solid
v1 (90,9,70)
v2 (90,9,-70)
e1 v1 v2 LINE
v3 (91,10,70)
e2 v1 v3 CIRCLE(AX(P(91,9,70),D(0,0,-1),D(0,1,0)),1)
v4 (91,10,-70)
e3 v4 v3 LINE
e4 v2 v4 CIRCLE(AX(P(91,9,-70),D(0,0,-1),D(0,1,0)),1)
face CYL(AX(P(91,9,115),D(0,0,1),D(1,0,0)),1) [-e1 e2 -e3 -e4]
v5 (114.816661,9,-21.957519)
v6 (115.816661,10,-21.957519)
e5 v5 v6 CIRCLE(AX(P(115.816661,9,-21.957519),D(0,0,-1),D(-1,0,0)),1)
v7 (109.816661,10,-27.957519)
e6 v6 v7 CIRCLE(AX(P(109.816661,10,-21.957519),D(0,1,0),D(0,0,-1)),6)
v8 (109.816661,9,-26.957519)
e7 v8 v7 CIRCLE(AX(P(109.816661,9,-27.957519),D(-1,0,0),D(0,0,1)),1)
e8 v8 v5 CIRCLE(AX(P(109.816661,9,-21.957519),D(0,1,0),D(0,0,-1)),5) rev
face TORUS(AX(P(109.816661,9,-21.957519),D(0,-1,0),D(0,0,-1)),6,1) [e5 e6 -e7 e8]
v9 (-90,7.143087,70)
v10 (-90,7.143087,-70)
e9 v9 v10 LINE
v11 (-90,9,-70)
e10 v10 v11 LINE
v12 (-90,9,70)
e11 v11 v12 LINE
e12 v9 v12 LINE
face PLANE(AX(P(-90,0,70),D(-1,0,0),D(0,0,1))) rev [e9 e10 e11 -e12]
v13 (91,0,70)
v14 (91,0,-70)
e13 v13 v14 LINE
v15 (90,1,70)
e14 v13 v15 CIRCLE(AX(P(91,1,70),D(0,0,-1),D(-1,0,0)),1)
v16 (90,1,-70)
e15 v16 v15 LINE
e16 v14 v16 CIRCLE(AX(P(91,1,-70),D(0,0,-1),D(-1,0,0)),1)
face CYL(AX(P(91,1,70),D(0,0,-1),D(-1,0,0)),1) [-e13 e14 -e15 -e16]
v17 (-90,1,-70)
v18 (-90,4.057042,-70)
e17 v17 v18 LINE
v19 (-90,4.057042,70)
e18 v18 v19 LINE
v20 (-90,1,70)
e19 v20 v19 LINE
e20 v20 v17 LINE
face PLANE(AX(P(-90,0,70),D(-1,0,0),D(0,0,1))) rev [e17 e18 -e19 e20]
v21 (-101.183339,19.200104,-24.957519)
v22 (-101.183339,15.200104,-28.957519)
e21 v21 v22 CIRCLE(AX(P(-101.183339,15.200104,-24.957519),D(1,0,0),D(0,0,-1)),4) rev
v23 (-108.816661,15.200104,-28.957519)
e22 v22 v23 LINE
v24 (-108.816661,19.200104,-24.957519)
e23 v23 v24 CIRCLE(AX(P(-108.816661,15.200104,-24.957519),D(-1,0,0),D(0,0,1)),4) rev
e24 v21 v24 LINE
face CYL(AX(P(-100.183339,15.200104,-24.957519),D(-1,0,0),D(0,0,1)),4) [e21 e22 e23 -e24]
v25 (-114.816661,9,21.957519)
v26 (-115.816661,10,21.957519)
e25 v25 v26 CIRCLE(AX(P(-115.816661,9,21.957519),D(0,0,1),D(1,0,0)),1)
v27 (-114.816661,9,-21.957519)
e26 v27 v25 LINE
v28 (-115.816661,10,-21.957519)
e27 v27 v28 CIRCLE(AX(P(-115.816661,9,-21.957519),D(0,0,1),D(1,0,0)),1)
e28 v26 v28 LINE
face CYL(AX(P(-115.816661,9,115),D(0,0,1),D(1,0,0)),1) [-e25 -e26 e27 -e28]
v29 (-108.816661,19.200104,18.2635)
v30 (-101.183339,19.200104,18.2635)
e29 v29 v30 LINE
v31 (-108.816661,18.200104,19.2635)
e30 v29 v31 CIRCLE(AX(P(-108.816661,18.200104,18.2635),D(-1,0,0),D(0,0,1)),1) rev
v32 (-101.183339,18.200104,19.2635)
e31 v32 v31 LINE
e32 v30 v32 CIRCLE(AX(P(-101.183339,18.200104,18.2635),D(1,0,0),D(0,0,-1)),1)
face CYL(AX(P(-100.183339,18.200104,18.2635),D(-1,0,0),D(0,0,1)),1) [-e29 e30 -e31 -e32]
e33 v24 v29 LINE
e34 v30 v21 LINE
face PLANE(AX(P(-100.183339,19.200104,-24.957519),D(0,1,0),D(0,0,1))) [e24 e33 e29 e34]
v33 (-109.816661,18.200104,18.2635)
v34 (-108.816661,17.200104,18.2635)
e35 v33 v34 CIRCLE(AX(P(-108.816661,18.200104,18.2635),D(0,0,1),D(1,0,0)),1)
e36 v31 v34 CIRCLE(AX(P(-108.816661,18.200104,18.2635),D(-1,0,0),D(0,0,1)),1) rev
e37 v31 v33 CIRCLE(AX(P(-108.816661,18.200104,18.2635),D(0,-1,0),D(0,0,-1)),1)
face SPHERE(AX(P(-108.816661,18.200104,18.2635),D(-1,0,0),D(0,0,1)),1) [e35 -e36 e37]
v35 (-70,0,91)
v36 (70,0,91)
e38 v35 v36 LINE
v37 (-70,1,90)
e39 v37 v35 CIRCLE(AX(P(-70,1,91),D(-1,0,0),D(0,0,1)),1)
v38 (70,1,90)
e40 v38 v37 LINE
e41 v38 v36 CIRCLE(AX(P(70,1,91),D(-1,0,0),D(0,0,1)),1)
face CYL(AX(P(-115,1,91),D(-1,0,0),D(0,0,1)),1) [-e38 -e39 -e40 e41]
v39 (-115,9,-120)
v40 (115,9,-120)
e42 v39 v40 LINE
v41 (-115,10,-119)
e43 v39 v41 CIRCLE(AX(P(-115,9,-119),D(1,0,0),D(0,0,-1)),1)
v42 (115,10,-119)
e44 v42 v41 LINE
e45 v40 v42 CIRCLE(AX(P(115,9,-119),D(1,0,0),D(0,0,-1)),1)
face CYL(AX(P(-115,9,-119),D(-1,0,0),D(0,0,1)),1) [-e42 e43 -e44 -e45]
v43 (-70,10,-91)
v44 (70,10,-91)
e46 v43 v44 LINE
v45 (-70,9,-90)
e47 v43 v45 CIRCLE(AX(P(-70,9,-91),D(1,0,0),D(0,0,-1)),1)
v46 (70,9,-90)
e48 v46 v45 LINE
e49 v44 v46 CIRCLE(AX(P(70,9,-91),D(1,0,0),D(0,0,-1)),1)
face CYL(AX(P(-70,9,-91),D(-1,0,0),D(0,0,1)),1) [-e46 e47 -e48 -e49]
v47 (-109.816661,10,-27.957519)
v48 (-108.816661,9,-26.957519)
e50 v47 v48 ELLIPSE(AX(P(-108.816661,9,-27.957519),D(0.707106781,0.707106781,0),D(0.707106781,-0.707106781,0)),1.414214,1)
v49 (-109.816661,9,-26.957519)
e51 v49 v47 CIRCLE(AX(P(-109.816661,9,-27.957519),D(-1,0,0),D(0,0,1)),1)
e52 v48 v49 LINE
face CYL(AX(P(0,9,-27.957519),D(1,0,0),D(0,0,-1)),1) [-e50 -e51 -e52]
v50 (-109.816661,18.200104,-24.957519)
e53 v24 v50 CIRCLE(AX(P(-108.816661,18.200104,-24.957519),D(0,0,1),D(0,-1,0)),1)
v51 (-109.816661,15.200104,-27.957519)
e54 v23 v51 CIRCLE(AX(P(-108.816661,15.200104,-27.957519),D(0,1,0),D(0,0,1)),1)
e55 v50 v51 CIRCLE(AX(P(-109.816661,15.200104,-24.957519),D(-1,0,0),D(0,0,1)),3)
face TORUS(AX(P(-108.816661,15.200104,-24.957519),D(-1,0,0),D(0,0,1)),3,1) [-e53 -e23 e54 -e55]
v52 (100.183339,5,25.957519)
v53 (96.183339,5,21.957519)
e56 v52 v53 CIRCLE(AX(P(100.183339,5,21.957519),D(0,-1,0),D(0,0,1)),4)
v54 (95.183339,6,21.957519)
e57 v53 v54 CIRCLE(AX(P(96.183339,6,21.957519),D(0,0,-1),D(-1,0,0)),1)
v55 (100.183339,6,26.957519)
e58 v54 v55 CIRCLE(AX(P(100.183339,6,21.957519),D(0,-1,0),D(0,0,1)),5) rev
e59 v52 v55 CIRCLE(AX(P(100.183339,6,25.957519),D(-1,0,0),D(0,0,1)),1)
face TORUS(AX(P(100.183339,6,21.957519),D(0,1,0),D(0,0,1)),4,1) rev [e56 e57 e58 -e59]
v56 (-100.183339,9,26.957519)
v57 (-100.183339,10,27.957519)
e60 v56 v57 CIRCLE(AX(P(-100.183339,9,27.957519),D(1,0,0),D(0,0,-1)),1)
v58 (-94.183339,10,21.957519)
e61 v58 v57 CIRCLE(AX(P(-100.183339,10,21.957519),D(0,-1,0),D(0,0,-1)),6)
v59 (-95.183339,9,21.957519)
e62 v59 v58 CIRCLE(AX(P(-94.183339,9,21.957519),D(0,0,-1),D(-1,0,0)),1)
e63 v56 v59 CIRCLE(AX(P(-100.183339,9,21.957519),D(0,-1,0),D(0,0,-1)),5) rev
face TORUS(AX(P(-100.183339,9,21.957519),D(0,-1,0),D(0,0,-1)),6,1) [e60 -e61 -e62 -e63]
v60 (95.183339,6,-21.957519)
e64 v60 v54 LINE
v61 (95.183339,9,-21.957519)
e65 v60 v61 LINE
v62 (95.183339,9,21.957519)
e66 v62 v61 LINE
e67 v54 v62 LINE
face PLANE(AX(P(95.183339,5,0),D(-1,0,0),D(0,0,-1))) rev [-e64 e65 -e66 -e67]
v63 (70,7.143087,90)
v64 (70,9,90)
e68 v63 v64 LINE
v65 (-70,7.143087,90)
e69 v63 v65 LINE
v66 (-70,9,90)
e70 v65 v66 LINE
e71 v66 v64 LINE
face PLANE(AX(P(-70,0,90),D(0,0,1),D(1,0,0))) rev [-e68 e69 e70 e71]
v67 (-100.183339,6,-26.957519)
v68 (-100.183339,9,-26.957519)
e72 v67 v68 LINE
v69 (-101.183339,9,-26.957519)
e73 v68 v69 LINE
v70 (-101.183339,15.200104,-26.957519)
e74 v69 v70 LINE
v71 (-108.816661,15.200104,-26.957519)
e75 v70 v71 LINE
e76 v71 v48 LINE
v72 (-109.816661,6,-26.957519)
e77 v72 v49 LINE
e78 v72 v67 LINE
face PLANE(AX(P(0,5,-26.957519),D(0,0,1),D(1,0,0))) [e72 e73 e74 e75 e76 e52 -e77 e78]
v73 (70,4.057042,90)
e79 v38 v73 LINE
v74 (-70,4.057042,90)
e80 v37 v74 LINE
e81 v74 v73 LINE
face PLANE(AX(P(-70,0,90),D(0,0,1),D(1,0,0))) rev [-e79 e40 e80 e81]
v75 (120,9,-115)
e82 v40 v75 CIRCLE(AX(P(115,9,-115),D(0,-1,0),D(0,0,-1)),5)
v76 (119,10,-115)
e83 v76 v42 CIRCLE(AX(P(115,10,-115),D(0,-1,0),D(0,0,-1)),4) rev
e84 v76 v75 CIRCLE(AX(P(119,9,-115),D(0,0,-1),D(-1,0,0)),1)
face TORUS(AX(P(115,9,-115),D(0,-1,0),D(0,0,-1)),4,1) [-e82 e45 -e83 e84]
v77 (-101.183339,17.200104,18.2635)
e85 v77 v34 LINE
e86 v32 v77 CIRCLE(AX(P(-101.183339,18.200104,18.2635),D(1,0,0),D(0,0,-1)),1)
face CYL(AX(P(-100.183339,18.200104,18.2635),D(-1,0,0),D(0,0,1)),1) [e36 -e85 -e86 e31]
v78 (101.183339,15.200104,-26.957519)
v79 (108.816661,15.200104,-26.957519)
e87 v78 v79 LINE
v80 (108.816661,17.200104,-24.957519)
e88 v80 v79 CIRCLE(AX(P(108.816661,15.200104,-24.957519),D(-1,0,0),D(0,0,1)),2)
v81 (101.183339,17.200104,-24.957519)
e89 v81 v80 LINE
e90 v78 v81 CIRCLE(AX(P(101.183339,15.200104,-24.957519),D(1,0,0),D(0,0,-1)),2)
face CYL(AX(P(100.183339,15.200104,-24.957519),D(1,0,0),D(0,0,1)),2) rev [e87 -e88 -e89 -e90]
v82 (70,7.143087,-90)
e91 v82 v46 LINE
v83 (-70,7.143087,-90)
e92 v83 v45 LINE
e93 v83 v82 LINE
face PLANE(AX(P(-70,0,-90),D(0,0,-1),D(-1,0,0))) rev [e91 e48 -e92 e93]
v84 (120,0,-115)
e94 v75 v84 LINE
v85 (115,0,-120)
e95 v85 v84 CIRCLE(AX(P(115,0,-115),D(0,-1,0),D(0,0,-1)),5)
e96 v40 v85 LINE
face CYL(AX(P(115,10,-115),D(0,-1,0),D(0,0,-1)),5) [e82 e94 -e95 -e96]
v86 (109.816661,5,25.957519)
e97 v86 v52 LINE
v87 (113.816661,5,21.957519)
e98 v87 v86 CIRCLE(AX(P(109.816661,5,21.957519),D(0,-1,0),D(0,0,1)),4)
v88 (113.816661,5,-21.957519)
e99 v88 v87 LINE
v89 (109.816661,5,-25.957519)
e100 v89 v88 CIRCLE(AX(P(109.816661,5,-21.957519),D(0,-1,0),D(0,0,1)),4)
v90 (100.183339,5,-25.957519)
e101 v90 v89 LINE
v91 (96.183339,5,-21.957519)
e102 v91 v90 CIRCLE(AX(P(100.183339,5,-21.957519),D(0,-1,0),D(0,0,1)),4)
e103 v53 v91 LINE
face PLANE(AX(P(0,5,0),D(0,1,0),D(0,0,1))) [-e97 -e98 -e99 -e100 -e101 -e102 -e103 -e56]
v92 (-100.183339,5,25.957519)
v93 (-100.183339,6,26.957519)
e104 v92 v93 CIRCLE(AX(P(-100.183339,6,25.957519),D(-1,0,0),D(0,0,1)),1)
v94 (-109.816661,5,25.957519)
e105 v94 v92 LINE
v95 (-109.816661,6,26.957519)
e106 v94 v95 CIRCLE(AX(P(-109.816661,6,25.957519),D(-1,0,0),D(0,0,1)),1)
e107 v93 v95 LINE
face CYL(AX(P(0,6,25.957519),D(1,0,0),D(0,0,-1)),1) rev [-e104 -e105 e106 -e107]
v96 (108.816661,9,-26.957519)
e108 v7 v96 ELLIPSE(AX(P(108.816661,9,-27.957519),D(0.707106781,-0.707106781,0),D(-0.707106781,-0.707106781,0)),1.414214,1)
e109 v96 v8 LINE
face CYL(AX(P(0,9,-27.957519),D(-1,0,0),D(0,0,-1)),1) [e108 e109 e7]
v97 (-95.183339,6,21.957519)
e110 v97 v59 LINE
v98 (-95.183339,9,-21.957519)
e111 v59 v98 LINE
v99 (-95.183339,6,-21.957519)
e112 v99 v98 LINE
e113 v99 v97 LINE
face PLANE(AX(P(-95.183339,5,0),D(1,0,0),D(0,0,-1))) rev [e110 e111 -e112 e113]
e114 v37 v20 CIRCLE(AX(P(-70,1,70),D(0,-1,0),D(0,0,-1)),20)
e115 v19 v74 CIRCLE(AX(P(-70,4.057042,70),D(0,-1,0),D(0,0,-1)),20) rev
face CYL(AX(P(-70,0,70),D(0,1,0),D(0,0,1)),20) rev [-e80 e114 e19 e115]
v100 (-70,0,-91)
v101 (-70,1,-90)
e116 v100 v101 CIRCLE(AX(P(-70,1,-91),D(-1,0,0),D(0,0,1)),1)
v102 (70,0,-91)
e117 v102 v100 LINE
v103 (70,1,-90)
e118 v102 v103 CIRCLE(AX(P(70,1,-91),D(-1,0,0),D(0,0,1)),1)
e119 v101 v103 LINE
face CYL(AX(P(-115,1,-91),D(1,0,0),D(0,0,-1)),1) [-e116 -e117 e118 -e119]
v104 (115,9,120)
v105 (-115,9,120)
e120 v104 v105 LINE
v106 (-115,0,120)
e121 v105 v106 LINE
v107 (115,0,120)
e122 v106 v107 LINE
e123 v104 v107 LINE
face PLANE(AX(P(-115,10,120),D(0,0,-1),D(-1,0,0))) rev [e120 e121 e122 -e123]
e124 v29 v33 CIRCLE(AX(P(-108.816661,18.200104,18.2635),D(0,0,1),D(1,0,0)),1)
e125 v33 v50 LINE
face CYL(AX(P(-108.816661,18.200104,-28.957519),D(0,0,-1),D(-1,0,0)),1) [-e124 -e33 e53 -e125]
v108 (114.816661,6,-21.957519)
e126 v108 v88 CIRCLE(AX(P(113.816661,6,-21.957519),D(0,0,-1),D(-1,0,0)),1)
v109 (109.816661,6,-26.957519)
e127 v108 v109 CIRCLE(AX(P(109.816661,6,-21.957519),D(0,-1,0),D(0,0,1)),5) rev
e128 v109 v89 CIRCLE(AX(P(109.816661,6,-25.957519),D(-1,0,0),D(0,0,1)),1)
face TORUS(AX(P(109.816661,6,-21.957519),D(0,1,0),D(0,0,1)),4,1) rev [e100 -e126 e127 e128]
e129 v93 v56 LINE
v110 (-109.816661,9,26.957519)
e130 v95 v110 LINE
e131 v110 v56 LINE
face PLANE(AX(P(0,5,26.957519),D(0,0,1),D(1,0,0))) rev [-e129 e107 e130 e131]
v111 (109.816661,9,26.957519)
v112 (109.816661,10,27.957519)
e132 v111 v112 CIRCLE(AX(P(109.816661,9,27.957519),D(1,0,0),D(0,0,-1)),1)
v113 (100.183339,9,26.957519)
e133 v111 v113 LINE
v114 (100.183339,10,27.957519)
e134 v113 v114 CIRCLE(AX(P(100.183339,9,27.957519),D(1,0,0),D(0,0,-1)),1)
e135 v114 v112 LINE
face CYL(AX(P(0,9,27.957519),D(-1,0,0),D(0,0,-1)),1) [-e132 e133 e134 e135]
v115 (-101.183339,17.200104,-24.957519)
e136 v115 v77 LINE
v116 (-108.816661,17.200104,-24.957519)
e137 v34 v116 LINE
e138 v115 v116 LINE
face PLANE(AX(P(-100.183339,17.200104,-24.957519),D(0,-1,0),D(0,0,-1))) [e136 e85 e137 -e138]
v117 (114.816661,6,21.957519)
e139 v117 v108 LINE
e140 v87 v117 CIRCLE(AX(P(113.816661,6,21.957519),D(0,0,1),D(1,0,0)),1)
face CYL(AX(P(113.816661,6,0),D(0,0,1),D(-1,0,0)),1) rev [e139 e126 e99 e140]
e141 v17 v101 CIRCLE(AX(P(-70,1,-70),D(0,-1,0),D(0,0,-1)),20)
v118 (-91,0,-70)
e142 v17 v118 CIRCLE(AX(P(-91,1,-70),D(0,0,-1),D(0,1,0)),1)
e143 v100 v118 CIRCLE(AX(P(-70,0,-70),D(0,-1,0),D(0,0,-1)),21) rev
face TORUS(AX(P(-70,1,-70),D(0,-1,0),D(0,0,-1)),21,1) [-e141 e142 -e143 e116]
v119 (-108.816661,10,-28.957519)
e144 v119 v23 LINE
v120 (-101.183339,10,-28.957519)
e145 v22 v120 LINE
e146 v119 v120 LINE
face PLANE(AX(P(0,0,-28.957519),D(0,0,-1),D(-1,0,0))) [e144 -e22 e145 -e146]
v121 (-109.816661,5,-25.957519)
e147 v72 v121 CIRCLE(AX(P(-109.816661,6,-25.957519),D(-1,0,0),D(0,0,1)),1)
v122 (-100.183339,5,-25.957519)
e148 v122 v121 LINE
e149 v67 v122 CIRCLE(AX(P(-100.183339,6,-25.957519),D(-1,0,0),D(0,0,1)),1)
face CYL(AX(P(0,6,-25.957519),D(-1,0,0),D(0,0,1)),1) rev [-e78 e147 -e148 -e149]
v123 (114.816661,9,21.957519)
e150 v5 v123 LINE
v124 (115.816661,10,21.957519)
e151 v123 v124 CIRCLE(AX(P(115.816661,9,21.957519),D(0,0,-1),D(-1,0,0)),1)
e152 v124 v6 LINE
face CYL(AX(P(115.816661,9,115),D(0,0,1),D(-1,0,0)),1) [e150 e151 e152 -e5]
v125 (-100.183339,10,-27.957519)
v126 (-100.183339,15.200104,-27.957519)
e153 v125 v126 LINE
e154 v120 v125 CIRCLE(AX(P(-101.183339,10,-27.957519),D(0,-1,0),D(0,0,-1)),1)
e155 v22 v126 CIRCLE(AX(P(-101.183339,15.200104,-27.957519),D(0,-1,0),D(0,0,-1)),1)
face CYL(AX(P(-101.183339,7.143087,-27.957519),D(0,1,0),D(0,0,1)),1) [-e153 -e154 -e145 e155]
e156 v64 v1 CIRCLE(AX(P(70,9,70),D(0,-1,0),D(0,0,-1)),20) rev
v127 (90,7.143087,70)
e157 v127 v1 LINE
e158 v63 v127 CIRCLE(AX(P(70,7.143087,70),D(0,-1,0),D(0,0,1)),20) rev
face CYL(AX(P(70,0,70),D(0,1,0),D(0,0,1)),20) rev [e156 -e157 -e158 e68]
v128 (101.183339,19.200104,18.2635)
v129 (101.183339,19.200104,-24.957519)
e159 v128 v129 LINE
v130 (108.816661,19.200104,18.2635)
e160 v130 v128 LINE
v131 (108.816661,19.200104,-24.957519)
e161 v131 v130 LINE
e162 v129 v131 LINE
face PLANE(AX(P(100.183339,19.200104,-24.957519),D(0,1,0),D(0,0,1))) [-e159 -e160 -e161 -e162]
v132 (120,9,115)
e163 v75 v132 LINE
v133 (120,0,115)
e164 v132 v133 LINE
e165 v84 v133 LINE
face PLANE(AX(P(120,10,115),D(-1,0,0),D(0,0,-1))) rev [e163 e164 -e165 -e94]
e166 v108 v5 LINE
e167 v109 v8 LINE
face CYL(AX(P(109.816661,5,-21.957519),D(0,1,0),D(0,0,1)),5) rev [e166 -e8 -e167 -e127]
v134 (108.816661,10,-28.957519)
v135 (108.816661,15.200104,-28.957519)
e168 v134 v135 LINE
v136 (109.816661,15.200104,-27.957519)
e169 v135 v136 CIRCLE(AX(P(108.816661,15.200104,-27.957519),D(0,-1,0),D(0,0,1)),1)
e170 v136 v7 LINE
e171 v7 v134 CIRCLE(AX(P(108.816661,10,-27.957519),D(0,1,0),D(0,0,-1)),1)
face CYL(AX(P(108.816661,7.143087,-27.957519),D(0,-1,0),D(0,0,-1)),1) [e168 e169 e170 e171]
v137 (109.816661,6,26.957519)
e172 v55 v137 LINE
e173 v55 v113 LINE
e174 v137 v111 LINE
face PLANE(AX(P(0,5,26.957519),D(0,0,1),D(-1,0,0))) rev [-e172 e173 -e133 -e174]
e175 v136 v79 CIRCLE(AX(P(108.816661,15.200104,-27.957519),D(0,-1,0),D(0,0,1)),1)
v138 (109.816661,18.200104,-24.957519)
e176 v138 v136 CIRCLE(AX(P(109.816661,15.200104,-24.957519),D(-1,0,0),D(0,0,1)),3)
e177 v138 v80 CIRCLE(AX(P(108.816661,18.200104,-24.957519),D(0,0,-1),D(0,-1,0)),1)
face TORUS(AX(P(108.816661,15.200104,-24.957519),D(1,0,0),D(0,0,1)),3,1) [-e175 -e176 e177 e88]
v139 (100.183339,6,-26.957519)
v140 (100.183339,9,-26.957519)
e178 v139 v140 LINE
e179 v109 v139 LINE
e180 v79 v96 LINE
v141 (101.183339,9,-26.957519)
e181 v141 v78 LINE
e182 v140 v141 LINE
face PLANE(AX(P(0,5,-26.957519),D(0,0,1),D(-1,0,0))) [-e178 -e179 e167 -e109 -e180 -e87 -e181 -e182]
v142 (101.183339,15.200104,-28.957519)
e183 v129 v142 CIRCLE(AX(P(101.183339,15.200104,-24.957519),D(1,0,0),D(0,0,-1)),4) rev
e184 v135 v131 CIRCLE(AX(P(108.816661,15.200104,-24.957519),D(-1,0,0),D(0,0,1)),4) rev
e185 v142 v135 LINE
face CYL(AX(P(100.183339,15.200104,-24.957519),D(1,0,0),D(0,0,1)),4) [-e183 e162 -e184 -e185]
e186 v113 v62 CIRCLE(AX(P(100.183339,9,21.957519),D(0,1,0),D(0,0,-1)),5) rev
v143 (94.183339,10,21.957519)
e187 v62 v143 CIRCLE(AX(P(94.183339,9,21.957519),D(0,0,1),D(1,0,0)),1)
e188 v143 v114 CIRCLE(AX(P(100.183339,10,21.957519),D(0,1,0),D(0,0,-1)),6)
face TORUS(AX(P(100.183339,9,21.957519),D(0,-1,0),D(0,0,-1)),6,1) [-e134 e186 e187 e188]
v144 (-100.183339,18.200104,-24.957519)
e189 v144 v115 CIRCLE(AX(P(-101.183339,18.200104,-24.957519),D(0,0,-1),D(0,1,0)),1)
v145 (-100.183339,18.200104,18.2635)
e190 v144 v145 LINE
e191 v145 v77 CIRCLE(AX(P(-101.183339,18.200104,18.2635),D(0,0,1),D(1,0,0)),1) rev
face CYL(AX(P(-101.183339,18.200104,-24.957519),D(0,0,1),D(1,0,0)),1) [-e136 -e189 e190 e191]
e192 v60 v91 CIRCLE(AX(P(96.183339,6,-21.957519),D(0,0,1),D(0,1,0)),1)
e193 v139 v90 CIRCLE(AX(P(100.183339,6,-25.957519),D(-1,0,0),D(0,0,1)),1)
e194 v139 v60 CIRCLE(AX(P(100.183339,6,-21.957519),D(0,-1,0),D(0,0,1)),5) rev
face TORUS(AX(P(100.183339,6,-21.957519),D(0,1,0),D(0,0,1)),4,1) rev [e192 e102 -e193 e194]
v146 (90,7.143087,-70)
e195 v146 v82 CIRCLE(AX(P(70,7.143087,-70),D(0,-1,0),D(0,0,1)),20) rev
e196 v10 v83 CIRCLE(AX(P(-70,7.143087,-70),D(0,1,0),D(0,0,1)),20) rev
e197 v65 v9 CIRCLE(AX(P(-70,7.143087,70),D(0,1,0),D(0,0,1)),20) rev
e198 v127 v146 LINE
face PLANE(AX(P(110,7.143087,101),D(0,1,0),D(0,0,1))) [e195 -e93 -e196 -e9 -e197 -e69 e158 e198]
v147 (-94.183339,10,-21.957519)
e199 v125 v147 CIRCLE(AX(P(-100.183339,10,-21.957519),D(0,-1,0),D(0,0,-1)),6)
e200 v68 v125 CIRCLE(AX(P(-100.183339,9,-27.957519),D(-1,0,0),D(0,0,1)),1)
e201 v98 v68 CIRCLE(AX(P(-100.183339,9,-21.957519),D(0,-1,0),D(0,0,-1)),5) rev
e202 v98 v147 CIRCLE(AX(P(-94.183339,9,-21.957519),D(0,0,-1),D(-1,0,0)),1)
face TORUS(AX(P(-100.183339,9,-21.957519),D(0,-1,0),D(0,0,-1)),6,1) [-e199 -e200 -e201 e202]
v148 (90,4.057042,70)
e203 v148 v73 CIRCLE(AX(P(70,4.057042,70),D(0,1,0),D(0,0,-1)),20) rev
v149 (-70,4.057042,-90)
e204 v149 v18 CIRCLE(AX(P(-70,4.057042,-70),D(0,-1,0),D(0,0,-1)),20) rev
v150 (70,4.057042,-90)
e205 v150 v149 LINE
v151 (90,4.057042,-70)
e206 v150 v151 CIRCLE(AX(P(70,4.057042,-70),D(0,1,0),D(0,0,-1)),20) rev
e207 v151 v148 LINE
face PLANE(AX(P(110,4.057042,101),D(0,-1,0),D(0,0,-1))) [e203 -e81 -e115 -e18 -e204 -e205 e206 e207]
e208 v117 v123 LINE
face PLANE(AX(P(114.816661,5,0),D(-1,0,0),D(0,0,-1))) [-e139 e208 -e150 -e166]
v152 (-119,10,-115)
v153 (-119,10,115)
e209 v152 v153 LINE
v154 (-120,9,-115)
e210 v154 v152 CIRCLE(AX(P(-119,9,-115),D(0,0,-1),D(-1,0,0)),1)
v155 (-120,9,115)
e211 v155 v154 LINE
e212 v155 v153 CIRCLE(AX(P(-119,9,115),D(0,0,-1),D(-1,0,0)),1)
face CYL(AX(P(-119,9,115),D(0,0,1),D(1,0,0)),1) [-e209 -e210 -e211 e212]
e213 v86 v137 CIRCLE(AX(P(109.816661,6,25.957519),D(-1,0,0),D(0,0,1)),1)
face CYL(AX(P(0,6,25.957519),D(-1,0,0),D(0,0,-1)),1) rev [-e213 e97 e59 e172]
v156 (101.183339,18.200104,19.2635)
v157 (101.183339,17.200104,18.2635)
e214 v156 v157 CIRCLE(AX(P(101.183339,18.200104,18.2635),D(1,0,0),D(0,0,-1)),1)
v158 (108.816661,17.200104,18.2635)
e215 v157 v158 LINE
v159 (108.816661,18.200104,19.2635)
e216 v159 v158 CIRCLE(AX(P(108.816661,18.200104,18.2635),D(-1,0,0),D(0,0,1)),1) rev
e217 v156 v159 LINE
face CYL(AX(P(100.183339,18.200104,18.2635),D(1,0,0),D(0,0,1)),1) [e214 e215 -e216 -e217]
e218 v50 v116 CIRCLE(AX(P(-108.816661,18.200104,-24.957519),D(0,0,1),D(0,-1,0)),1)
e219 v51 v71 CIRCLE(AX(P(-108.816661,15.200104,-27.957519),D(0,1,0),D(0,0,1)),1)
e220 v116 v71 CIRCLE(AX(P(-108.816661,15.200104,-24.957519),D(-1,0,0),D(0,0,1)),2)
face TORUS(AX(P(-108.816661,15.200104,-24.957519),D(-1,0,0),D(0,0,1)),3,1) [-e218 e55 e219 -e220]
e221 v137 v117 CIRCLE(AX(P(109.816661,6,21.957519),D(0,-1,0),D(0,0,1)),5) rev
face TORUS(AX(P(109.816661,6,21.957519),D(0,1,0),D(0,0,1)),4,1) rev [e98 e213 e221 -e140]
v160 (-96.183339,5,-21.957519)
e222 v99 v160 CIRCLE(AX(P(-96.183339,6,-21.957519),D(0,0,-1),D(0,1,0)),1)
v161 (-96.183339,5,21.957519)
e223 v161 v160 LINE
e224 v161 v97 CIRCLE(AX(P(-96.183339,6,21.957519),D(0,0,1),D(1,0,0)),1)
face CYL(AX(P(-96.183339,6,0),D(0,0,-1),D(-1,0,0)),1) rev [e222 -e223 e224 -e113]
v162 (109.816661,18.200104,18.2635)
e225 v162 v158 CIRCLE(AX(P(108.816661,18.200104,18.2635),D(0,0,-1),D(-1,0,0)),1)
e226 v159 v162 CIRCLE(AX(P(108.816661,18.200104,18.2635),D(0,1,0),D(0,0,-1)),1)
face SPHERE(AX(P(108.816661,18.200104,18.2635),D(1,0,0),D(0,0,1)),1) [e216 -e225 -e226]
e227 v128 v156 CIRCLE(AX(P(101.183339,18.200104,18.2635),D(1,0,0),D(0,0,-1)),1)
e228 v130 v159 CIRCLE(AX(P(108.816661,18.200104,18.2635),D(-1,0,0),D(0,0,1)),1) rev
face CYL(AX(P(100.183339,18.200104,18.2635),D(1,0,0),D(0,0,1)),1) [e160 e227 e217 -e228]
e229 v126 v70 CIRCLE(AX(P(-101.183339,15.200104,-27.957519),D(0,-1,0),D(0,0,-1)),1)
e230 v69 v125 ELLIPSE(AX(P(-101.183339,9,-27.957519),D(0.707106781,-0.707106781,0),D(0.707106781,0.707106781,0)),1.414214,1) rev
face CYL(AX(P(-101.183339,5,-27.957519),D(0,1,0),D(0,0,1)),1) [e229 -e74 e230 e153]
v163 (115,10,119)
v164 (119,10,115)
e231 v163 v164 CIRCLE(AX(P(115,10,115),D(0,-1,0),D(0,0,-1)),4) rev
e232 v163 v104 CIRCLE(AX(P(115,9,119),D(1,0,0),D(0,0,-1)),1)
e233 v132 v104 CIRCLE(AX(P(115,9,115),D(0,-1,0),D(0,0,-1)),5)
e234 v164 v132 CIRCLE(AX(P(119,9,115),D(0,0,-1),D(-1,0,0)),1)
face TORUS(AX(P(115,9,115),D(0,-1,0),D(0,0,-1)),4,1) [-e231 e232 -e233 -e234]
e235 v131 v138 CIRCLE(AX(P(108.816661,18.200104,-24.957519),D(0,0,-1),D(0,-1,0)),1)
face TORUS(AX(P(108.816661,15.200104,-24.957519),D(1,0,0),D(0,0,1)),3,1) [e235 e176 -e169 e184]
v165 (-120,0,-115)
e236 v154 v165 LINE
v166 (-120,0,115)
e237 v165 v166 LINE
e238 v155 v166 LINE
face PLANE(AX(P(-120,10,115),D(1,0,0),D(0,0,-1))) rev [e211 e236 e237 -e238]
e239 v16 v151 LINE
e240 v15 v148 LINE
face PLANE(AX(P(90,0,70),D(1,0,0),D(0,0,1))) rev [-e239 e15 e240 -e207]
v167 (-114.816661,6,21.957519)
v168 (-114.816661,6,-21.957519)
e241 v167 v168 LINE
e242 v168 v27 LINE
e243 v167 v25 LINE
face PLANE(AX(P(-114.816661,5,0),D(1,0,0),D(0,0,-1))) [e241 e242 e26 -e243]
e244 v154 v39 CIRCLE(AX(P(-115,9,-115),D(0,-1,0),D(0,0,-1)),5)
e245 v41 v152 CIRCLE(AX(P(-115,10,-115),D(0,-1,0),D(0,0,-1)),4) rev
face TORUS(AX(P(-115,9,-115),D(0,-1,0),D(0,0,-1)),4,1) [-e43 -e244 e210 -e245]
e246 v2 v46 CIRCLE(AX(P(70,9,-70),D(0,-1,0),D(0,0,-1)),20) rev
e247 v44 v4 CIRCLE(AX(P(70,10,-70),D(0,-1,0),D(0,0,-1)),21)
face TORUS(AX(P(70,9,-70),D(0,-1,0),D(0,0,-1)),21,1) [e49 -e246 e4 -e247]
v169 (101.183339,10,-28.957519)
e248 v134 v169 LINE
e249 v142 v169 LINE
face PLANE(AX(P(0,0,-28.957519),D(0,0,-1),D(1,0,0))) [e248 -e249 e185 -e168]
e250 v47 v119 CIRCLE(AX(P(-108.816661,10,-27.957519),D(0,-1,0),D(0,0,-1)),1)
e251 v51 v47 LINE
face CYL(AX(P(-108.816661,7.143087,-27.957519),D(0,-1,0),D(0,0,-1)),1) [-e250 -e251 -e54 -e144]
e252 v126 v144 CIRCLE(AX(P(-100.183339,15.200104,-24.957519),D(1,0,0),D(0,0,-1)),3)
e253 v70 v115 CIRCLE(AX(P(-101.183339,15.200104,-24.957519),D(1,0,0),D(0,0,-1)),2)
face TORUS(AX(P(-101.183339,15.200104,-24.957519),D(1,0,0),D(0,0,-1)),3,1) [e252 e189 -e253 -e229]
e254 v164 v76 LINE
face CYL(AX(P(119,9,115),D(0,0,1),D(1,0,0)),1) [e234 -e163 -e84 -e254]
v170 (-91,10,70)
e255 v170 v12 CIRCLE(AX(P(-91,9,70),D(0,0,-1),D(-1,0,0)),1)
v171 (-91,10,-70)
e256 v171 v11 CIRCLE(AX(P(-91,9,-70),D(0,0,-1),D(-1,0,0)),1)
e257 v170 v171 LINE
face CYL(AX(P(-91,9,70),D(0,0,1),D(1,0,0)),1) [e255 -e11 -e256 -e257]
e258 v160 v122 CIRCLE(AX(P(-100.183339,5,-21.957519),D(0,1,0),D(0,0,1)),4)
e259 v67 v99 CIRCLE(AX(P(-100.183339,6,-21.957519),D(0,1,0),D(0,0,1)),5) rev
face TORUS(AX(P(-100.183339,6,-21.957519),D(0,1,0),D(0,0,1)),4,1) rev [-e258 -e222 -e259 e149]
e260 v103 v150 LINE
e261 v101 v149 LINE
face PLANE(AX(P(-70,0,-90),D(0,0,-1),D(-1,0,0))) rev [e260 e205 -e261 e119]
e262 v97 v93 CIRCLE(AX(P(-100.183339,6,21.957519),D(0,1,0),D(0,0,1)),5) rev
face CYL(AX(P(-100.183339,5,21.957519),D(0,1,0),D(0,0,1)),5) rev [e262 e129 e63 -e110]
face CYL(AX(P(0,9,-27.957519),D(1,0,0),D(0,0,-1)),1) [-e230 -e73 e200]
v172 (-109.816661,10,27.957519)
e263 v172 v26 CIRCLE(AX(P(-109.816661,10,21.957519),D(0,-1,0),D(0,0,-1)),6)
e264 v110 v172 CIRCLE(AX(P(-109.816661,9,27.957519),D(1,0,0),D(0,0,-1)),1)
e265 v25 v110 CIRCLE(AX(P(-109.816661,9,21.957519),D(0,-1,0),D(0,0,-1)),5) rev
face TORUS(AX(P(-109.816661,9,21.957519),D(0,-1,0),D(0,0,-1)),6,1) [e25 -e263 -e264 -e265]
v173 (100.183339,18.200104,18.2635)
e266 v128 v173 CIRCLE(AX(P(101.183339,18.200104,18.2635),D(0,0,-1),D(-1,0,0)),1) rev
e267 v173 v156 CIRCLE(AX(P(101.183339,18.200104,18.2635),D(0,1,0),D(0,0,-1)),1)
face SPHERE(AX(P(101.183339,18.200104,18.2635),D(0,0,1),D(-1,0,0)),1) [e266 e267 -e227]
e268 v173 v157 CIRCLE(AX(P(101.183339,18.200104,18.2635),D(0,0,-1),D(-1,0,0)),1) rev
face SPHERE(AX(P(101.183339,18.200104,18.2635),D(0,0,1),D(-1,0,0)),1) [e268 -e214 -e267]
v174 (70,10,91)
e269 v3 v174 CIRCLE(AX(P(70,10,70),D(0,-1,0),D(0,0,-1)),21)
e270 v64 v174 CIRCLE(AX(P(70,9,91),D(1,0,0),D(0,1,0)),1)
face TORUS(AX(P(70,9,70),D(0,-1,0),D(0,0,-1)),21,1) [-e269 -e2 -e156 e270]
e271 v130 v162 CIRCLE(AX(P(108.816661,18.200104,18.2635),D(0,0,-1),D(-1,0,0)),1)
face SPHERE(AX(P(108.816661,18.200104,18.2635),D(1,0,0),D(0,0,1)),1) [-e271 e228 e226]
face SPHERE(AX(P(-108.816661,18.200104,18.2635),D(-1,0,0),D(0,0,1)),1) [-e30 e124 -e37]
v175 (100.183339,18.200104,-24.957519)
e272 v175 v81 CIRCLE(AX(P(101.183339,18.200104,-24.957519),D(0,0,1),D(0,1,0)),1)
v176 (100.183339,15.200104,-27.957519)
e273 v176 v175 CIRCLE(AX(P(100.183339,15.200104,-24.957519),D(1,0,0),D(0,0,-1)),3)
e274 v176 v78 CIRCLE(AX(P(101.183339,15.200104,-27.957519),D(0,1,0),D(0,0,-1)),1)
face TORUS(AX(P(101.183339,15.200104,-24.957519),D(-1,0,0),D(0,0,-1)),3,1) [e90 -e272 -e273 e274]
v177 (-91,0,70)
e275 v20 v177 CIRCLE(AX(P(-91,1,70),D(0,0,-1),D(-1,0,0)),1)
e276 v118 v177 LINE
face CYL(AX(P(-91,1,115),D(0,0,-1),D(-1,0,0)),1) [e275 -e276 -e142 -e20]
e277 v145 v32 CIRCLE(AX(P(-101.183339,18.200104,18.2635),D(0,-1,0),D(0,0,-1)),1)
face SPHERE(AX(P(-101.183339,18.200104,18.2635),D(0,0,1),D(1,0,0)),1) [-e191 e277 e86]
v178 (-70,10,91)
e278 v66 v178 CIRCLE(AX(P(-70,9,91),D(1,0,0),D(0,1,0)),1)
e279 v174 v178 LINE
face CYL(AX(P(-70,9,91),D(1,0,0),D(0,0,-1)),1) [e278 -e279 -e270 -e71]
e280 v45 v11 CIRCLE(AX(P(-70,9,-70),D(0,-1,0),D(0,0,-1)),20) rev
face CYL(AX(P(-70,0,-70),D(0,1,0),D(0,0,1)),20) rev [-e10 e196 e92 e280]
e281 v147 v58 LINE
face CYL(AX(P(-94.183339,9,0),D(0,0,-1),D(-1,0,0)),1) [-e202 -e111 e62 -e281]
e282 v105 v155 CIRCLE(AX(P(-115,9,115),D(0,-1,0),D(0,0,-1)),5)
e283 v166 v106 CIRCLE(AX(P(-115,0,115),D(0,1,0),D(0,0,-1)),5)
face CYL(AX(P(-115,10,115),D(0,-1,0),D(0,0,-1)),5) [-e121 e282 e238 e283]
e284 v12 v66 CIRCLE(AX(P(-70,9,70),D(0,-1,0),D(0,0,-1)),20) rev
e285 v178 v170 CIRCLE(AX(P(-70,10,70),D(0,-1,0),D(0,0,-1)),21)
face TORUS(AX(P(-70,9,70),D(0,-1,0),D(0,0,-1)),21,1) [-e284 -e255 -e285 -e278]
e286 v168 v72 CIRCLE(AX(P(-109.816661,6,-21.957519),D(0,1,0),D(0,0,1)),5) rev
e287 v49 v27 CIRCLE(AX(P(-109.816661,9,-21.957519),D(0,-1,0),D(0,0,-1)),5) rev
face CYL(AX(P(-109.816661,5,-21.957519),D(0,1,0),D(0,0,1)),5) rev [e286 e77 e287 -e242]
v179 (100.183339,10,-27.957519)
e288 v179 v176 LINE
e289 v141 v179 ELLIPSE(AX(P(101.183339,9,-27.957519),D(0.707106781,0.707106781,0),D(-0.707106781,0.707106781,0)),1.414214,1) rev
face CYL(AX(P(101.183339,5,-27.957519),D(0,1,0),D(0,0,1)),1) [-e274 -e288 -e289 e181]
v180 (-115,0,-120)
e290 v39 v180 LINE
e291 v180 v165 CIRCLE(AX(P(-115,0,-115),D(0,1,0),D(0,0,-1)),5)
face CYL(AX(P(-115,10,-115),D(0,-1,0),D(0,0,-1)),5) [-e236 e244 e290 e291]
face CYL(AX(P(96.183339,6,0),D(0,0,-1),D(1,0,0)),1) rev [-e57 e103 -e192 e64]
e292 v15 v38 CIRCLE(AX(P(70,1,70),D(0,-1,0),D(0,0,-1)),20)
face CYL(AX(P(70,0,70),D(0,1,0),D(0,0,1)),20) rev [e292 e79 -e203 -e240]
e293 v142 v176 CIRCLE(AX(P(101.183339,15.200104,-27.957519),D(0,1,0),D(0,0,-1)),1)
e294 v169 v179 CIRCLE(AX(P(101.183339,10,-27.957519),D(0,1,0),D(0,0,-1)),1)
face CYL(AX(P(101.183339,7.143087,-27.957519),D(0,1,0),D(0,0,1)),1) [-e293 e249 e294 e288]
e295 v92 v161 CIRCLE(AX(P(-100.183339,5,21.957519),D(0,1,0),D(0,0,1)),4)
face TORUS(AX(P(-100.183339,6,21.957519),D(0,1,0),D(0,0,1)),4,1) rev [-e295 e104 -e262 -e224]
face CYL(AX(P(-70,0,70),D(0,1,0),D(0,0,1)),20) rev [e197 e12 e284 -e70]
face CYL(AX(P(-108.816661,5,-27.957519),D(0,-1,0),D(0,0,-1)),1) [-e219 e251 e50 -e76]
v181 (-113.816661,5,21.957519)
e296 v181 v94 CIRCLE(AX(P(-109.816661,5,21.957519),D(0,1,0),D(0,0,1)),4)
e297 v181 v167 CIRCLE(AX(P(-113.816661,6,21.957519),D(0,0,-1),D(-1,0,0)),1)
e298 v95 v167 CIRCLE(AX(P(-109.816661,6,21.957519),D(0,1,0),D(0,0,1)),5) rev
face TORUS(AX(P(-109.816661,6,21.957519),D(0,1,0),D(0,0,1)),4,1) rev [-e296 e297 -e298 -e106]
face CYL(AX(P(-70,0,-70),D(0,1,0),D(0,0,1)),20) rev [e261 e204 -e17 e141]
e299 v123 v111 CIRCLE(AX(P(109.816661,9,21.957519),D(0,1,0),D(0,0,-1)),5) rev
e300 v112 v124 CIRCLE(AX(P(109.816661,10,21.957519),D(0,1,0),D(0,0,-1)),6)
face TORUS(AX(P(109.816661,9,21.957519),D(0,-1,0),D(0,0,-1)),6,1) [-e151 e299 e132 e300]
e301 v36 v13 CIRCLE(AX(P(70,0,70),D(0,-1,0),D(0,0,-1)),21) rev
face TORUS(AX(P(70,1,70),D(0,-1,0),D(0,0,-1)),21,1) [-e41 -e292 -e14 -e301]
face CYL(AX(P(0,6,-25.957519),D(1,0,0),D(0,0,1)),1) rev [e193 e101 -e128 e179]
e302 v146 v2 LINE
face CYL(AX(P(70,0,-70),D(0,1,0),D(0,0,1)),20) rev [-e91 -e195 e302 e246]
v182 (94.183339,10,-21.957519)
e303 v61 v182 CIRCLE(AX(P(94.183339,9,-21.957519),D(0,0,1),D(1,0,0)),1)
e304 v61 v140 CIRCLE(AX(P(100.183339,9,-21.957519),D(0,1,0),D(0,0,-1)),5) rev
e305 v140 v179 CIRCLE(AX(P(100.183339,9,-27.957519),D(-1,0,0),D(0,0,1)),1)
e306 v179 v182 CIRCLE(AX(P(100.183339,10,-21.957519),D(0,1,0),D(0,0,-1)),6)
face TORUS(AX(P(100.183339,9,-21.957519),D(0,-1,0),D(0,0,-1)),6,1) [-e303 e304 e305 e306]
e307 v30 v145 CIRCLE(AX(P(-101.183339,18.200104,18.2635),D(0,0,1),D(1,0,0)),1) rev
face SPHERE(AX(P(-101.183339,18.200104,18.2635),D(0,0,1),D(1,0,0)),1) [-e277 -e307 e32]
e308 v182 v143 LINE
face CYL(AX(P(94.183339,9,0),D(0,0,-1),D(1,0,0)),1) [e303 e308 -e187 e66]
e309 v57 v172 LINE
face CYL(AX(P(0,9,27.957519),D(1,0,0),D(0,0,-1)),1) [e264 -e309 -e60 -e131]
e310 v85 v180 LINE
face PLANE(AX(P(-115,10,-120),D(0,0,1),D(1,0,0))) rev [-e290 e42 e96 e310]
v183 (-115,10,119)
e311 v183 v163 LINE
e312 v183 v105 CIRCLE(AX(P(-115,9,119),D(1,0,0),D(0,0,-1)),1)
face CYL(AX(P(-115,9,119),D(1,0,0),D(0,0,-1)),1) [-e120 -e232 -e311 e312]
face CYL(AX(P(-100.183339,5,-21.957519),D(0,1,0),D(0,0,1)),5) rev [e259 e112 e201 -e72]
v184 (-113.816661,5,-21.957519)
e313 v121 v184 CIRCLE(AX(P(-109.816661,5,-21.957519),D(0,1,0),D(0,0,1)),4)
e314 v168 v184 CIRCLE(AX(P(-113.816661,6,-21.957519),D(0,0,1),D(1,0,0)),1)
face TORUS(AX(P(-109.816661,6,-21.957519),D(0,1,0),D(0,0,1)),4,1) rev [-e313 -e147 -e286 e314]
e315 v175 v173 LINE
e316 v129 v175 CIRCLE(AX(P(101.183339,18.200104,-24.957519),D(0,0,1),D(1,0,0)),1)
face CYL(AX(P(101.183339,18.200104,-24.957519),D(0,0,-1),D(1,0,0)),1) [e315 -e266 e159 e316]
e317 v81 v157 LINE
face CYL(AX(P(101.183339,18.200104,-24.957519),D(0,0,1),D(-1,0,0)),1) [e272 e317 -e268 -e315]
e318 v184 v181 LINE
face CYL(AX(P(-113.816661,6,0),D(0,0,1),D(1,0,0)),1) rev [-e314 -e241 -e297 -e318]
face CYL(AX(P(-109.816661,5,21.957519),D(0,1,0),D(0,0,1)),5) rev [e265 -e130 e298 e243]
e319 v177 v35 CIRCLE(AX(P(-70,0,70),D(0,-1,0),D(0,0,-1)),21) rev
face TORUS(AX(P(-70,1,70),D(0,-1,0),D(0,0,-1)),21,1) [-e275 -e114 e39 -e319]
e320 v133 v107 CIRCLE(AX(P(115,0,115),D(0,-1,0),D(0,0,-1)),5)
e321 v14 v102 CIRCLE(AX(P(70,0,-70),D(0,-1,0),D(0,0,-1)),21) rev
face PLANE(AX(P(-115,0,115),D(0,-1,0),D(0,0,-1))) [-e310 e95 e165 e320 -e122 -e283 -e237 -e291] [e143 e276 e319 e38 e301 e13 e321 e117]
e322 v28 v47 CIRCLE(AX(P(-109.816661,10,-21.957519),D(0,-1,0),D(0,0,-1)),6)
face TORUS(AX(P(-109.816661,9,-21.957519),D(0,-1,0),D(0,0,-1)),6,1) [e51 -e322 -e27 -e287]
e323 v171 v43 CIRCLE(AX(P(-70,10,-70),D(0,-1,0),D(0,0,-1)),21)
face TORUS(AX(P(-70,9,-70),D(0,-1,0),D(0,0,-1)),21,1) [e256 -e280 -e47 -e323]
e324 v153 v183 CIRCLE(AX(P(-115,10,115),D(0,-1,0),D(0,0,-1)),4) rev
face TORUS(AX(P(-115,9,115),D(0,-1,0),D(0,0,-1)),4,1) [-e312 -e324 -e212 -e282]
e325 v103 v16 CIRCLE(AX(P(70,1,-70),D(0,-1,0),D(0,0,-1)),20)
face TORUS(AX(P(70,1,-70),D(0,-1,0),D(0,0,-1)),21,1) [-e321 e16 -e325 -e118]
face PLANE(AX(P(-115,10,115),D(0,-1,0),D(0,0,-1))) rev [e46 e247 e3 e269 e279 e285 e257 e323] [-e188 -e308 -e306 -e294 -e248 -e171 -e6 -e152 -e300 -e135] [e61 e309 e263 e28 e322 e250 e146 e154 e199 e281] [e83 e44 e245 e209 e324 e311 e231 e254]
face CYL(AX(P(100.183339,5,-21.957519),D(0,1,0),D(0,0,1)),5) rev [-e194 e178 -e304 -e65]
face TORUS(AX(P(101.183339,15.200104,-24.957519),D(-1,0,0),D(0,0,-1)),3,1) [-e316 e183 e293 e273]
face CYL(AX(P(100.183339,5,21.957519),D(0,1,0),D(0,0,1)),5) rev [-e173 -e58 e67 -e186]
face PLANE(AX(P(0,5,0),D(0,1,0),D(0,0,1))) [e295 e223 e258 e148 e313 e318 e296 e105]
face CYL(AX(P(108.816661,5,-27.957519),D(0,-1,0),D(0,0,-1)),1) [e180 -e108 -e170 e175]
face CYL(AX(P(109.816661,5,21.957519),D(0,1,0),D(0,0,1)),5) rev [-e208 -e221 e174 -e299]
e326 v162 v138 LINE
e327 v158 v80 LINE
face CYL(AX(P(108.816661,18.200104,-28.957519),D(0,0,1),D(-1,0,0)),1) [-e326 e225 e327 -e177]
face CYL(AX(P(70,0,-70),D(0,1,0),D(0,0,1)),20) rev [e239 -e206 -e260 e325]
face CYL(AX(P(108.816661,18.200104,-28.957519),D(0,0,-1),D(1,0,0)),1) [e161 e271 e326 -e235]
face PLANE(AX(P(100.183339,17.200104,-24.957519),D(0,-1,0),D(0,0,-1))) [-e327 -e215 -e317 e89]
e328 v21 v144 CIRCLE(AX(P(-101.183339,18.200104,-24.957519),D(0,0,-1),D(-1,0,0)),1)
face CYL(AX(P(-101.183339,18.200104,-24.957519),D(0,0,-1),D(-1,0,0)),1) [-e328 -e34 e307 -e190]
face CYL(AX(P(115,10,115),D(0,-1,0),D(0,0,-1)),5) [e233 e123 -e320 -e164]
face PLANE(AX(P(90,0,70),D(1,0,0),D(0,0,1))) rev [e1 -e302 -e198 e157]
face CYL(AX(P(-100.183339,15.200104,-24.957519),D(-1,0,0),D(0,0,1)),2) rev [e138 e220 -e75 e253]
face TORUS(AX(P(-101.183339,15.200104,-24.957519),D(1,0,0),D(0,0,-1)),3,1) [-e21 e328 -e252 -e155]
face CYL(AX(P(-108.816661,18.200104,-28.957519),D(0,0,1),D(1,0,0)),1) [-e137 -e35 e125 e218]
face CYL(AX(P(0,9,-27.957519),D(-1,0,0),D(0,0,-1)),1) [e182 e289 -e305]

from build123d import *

# Parameters (mm, degrees)
EXTRUDE_1_DEPTH     = 10
CUT_EXTRUDE_1_DEPTH = 10
SKETCH_3_W          = 225
SKETCH_3_H          = 3.086045957
EXTRUDE_2_DEPTH     = 221
CUT_EXTRUDE_2_DEPTH = 5
SKETCH_6_W          = 9.633321968
SKETCH_6_H          = 6.578899038
EXTRUDE_3_DEPTH     = 2
EXTRUDE_4_DEPTH     = 9.63332197
FILLET_1_R          = 1
FILLET_3_R          = 1
FILLET_4_R          = 1
SKETCH_10_W         = 142.442199646
SKETCH_10_H         = 252.346997023
CUT_EXTRUDE_3_DEPTH = 36.7
FILLET_5_R          = 1
FILLET_6_R          = 1


with BuildPart() as part:
    # 草图1 → 凸台-拉伸1 (new body)
    with BuildSketch(Plane(origin=(0, 0, 0), x_dir=(1, 0, 0), z_dir=(0, 1, 0))):
        with BuildLine():
            Line((-115, -120), (115, -120))
            ThreePointArc((115, -120), (118.535533906, -118.535533906), (120, -115))
            Line((120, -115), (120, 115))
            ThreePointArc((120, 115), (118.535533906, 118.535533906), (115, 120))
            Line((115, 120), (-115, 120))
            ThreePointArc((-115, 120), (-118.535533906, 118.535533906), (-120, 115))
            Line((-120, 115), (-120, -115))
            ThreePointArc((-120, -115), (-118.535533906, -118.535533906), (-115, -120))
        make_face()
    extrude(amount=EXTRUDE_1_DEPTH)

    # 草图2 → 切除-拉伸1 (cut)
    with BuildSketch(Plane(origin=(0, 10, 0), x_dir=(1, 0, 0), z_dir=(0, 1, 0))):
        with BuildLine():
            Line((-70, -90), (70, -90))
            ThreePointArc((70, -90), (84.142135624, -84.142135624), (90, -70))
            Line((90, -70), (90, 70))
            ThreePointArc((90, 70), (84.142135624, 84.142135624), (70, 90))
            Line((70, 90), (-70, 90))
            ThreePointArc((-70, 90), (-84.142135624, 84.142135624), (-90, 70))
            Line((-90, 70), (-90, -70))
            ThreePointArc((-90, -70), (-84.142135624, -84.142135624), (-70, -90))
        make_face()
    extrude(amount=-CUT_EXTRUDE_1_DEPTH, mode=Mode.SUBTRACT)


with BuildPart() as body_2:
    # 草图3 → 凸台-拉伸2 (new body)
    with BuildSketch(Plane(origin=(0, 0, -120), x_dir=(-1, 0, 0), z_dir=(0, 0, -1))):
        with Locations((2.5, 5.600064492)):
            Rectangle(SKETCH_3_W, SKETCH_3_H)
    extrude(amount=-EXTRUDE_2_DEPTH)


with BuildPart() as cut_extrude_2_tool:
    # 草图5 → 切除-拉伸2 (new body)
    with BuildSketch(Plane(origin=(0, 10, 0), x_dir=(1, 0, 0), z_dir=(0, 1, 0))):
        with BuildLine():
            Line((-114.816660984, 21.957519092), (-114.816660984, 0))
            Line((-114.816660984, 0), (-95.183339016, 0))
            Line((-95.183339016, 0), (-95.183339016, 21.957519092))
            ThreePointArc((-95.183339016, 21.957519092), (-96.64780511, 25.493052998), (-100.183339016, 26.957519092))
            Line((-100.183339016, 26.957519092), (-109.816660984, 26.957519092))
            ThreePointArc((-109.816660984, 26.957519092), (-113.35219489, 25.493052998), (-114.816660984, 21.957519092))
        make_face()
        with BuildLine():
            Line((-95.183339016, 0), (-114.816660984, 0))
            Line((-114.816660984, 0), (-114.816660984, -21.957519092))
            ThreePointArc((-114.816660984, -21.957519092), (-113.35219489, -25.493052998), (-109.816660984, -26.957519092))
            Line((-109.816660984, -26.957519092), (-100.183339016, -26.957519092))
            ThreePointArc((-100.183339016, -26.957519092), (-96.64780511, -25.493052998), (-95.183339016, -21.957519092))
            Line((-95.183339016, -21.957519092), (-95.183339016, 0))
        make_face()
        with BuildLine():
            Line((95.183339016, 21.957519092), (95.183339016, 0))
            Line((95.183339016, 0), (114.816660984, 0))
            Line((114.816660984, 0), (114.816660984, 21.957519092))
            ThreePointArc((114.816660984, 21.957519092), (113.35219489, 25.493052998), (109.816660984, 26.957519092))
            Line((109.816660984, 26.957519092), (100.183339016, 26.957519092))
            ThreePointArc((100.183339016, 26.957519092), (96.64780511, 25.493052998), (95.183339016, 21.957519092))
        make_face()
        with BuildLine():
            ThreePointArc((95.183339016, -21.957519092), (96.64780511, -25.493052998), (100.183339016, -26.957519092))
            Line((100.183339016, -26.957519092), (109.816660984, -26.957519092))
            ThreePointArc((109.816660984, -26.957519092), (113.35219489, -25.493052998), (114.816660984, -21.957519092))
            Line((114.816660984, -21.957519092), (114.816660984, 0))
            Line((114.816660984, 0), (95.183339016, 0))
            Line((95.183339016, 0), (95.183339016, -21.957519092))
        make_face()
    extrude(amount=-CUT_EXTRUDE_2_DEPTH)


with BuildPart() as part_1:
    add(part.part)

    # 切除-拉伸2: cut by cut_extrude_2_tool
    add(cut_extrude_2_tool.part, mode=Mode.SUBTRACT)



with BuildPart() as body_2_1:
    add(body_2.part)

    # 切除-拉伸2: cut by cut_extrude_2_tool
    add(cut_extrude_2_tool.part, mode=Mode.SUBTRACT)


with BuildPart() as part_2:
    add(part_1.part)

    add(body_2_1.part)  # 凸台-拉伸3 merges body 2
    # 草图6 → 凸台-拉伸3 (add)
    with BuildSketch(Plane.XY.offset(-26.957519092)):
        with Locations((-105, 10.432536989)):
            Rectangle(SKETCH_6_W, SKETCH_6_H)
    extrude(amount=-EXTRUDE_3_DEPTH)

    # 草图9 → 凸台-拉伸4 (add)
    with BuildSketch(Plane.ZY.offset(109.816660984)):
        with BuildLine():
            Line((-24.957519092, 17.200103887), (19.2635004, 17.200103887))
            Line((19.2635004, 17.200103887), (19.2635004, 19.200103887))
            Line((19.2635004, 19.200103887), (-24.957519092, 19.200103887))
            ThreePointArc((-24.957519092, 19.200103887), (-27.785946217, 18.028531012), (-28.957519092, 15.200103887))
            Line((-28.957519092, 15.200103887), (-28.957519092, 13.304316338))
            Line((-28.957519092, 13.304316338), (-26.957519092, 13.304316338))
            Line((-26.957519092, 13.304316338), (-26.957519092, 15.200103887))
            ThreePointArc((-26.957519092, 15.200103887), (-26.371732654, 16.61431745), (-24.957519092, 17.200103887))
        make_face()
    extrude(amount=-EXTRUDE_4_DEPTH)

    # 圆角1
    fillet_1_edges = [part_2.edges().sort_by_distance(p)[0] for p in [
        (-109.816660984, 12.600051944, -26.957519092),
        (-100.183339016, 11.860993254, -26.957519092),
        (-109.816660984, 12.600051944, -28.957519092),
        (-100.183339016, 11.860993254, -28.957519092),
        (-100.183339014, 18.200103887, 19.2635004),
        (-104.999999999, 19.200103887, 19.2635004),
        (-100.183339014, 17.200103887, -2.847009346),
        (-104.999999999, 17.200103887, 19.2635004),
        (-100.183339014, 16.61431745, -26.371732654),
        (-100.183339014, 18.028531012, -27.785946217),
        (-100.183339014, 19.200103887, -2.847009346),
        (-109.816660984, 16.61431745, -26.371732654),
        (-109.816660984, 17.200103887, -2.847009346),
        (-109.816660984, 18.200103887, 19.2635004),
        (-109.816660984, 19.200103887, -2.847009346),
        (-109.816660984, 18.028531012, -27.785946217),
    ]]
    fillet(fillet_1_edges, radius=FILLET_1_R - 0.0001)  # a hair under: the kernel refuses the full size

    # 圆角3
    fillet_3_edges = [part_2.edges().sort_by_distance(p)[0] for p in [
        (-95.183339016, 5, 0),
        (-96.64780511, 5, 25.493052998),
        (-105, 5, 26.957519092),
        (-96.64780511, 5, -25.493052998),
        (-113.35219489, 5, 25.493052998),
        (-114.816660984, 5, 0),
        (-113.35219489, 5, -25.493052998),
        (-105, 5, -26.957519092),
    ]]
    fillet(fillet_3_edges, radius=FILLET_3_R)

    # 圆角4
    fillet_4_edges = [part_2.edges().sort_by_distance(p)[0] for p in [
        (-100.683289016, 10, -26.957519092),
        (-109.316710984, 10, -26.957519092),
        (-113.35219489, 10, -25.493052998),
        (-114.816660984, 10, 0),
        (-113.35219489, 10, 25.493052998),
        (-105, 10, 26.957519092),
        (-96.64780511, 10, 25.493052998),
        (-95.183339016, 10, 0),
        (-96.64780511, 10, -25.493052998),
    ]]
    fillet(fillet_4_edges, radius=FILLET_4_R - 0.0001)  # a hair under: the kernel refuses the full size

    # 草图10 → 切除-拉伸3 (cut)
    with BuildSketch(Plane(origin=(0, 10, 0), x_dir=(1, 0, 0), z_dir=(0, 1, 0))):
        with Locations((71.221099823, 6.173498511)):
            Rectangle(SKETCH_10_W, SKETCH_10_H)
    extrude(amount=-CUT_EXTRUDE_3_DEPTH, mode=Mode.SUBTRACT)

    # 镜向1: part across plane


with BuildPart() as part_3:
    add(part_2.part)
    add(part_2.part.mirror(Plane(origin=(0, -26.7, 120), x_dir=(0, 0, 1), z_dir=(-1, 0, 0))))

    # 圆角5
    fillet_5_edges = [part_3.edges().sort_by_distance(p)[0] for p in [
        (-118.535533906, 10, -118.535533906),
        (-120, 10, 0),
        (0, 10, -120),
        (118.535533906, 10, 118.535533906),
        (118.535533906, 10, -118.535533906),
        (120, 10, 0),
        (-118.535533906, 10, 118.535533906),
        (0, 10, 120),
    ]]
    fillet(fillet_5_edges, radius=FILLET_5_R)

    # 圆角6
    fillet_6_edges = [part_3.edges().sort_by_distance(p)[0] for p in [
        (-84.142135624, 0, 84.142135624),
        (-90, 0, 0),
        (-84.142135624, 0, -84.142135624),
        (0, 0, 90),
        (0, 0, -90),
        (-84.142135624, 10, 84.142135624),
        (0, 10, -90),
        (0, 10, 90),
        (-84.142135624, 10, -84.142135624),
        (-90, 10, 0),
        (84.142135624, 10, -84.142135624),
        (90, 10, 0),
        (84.142135624, 10, 84.142135624),
        (84.142135624, 0, 84.142135624),
        (90, 0, 0),
        (84.142135624, 0, -84.142135624),
    ]]
    fillet(fillet_6_edges, radius=FILLET_6_R)


solid = part_3.part
